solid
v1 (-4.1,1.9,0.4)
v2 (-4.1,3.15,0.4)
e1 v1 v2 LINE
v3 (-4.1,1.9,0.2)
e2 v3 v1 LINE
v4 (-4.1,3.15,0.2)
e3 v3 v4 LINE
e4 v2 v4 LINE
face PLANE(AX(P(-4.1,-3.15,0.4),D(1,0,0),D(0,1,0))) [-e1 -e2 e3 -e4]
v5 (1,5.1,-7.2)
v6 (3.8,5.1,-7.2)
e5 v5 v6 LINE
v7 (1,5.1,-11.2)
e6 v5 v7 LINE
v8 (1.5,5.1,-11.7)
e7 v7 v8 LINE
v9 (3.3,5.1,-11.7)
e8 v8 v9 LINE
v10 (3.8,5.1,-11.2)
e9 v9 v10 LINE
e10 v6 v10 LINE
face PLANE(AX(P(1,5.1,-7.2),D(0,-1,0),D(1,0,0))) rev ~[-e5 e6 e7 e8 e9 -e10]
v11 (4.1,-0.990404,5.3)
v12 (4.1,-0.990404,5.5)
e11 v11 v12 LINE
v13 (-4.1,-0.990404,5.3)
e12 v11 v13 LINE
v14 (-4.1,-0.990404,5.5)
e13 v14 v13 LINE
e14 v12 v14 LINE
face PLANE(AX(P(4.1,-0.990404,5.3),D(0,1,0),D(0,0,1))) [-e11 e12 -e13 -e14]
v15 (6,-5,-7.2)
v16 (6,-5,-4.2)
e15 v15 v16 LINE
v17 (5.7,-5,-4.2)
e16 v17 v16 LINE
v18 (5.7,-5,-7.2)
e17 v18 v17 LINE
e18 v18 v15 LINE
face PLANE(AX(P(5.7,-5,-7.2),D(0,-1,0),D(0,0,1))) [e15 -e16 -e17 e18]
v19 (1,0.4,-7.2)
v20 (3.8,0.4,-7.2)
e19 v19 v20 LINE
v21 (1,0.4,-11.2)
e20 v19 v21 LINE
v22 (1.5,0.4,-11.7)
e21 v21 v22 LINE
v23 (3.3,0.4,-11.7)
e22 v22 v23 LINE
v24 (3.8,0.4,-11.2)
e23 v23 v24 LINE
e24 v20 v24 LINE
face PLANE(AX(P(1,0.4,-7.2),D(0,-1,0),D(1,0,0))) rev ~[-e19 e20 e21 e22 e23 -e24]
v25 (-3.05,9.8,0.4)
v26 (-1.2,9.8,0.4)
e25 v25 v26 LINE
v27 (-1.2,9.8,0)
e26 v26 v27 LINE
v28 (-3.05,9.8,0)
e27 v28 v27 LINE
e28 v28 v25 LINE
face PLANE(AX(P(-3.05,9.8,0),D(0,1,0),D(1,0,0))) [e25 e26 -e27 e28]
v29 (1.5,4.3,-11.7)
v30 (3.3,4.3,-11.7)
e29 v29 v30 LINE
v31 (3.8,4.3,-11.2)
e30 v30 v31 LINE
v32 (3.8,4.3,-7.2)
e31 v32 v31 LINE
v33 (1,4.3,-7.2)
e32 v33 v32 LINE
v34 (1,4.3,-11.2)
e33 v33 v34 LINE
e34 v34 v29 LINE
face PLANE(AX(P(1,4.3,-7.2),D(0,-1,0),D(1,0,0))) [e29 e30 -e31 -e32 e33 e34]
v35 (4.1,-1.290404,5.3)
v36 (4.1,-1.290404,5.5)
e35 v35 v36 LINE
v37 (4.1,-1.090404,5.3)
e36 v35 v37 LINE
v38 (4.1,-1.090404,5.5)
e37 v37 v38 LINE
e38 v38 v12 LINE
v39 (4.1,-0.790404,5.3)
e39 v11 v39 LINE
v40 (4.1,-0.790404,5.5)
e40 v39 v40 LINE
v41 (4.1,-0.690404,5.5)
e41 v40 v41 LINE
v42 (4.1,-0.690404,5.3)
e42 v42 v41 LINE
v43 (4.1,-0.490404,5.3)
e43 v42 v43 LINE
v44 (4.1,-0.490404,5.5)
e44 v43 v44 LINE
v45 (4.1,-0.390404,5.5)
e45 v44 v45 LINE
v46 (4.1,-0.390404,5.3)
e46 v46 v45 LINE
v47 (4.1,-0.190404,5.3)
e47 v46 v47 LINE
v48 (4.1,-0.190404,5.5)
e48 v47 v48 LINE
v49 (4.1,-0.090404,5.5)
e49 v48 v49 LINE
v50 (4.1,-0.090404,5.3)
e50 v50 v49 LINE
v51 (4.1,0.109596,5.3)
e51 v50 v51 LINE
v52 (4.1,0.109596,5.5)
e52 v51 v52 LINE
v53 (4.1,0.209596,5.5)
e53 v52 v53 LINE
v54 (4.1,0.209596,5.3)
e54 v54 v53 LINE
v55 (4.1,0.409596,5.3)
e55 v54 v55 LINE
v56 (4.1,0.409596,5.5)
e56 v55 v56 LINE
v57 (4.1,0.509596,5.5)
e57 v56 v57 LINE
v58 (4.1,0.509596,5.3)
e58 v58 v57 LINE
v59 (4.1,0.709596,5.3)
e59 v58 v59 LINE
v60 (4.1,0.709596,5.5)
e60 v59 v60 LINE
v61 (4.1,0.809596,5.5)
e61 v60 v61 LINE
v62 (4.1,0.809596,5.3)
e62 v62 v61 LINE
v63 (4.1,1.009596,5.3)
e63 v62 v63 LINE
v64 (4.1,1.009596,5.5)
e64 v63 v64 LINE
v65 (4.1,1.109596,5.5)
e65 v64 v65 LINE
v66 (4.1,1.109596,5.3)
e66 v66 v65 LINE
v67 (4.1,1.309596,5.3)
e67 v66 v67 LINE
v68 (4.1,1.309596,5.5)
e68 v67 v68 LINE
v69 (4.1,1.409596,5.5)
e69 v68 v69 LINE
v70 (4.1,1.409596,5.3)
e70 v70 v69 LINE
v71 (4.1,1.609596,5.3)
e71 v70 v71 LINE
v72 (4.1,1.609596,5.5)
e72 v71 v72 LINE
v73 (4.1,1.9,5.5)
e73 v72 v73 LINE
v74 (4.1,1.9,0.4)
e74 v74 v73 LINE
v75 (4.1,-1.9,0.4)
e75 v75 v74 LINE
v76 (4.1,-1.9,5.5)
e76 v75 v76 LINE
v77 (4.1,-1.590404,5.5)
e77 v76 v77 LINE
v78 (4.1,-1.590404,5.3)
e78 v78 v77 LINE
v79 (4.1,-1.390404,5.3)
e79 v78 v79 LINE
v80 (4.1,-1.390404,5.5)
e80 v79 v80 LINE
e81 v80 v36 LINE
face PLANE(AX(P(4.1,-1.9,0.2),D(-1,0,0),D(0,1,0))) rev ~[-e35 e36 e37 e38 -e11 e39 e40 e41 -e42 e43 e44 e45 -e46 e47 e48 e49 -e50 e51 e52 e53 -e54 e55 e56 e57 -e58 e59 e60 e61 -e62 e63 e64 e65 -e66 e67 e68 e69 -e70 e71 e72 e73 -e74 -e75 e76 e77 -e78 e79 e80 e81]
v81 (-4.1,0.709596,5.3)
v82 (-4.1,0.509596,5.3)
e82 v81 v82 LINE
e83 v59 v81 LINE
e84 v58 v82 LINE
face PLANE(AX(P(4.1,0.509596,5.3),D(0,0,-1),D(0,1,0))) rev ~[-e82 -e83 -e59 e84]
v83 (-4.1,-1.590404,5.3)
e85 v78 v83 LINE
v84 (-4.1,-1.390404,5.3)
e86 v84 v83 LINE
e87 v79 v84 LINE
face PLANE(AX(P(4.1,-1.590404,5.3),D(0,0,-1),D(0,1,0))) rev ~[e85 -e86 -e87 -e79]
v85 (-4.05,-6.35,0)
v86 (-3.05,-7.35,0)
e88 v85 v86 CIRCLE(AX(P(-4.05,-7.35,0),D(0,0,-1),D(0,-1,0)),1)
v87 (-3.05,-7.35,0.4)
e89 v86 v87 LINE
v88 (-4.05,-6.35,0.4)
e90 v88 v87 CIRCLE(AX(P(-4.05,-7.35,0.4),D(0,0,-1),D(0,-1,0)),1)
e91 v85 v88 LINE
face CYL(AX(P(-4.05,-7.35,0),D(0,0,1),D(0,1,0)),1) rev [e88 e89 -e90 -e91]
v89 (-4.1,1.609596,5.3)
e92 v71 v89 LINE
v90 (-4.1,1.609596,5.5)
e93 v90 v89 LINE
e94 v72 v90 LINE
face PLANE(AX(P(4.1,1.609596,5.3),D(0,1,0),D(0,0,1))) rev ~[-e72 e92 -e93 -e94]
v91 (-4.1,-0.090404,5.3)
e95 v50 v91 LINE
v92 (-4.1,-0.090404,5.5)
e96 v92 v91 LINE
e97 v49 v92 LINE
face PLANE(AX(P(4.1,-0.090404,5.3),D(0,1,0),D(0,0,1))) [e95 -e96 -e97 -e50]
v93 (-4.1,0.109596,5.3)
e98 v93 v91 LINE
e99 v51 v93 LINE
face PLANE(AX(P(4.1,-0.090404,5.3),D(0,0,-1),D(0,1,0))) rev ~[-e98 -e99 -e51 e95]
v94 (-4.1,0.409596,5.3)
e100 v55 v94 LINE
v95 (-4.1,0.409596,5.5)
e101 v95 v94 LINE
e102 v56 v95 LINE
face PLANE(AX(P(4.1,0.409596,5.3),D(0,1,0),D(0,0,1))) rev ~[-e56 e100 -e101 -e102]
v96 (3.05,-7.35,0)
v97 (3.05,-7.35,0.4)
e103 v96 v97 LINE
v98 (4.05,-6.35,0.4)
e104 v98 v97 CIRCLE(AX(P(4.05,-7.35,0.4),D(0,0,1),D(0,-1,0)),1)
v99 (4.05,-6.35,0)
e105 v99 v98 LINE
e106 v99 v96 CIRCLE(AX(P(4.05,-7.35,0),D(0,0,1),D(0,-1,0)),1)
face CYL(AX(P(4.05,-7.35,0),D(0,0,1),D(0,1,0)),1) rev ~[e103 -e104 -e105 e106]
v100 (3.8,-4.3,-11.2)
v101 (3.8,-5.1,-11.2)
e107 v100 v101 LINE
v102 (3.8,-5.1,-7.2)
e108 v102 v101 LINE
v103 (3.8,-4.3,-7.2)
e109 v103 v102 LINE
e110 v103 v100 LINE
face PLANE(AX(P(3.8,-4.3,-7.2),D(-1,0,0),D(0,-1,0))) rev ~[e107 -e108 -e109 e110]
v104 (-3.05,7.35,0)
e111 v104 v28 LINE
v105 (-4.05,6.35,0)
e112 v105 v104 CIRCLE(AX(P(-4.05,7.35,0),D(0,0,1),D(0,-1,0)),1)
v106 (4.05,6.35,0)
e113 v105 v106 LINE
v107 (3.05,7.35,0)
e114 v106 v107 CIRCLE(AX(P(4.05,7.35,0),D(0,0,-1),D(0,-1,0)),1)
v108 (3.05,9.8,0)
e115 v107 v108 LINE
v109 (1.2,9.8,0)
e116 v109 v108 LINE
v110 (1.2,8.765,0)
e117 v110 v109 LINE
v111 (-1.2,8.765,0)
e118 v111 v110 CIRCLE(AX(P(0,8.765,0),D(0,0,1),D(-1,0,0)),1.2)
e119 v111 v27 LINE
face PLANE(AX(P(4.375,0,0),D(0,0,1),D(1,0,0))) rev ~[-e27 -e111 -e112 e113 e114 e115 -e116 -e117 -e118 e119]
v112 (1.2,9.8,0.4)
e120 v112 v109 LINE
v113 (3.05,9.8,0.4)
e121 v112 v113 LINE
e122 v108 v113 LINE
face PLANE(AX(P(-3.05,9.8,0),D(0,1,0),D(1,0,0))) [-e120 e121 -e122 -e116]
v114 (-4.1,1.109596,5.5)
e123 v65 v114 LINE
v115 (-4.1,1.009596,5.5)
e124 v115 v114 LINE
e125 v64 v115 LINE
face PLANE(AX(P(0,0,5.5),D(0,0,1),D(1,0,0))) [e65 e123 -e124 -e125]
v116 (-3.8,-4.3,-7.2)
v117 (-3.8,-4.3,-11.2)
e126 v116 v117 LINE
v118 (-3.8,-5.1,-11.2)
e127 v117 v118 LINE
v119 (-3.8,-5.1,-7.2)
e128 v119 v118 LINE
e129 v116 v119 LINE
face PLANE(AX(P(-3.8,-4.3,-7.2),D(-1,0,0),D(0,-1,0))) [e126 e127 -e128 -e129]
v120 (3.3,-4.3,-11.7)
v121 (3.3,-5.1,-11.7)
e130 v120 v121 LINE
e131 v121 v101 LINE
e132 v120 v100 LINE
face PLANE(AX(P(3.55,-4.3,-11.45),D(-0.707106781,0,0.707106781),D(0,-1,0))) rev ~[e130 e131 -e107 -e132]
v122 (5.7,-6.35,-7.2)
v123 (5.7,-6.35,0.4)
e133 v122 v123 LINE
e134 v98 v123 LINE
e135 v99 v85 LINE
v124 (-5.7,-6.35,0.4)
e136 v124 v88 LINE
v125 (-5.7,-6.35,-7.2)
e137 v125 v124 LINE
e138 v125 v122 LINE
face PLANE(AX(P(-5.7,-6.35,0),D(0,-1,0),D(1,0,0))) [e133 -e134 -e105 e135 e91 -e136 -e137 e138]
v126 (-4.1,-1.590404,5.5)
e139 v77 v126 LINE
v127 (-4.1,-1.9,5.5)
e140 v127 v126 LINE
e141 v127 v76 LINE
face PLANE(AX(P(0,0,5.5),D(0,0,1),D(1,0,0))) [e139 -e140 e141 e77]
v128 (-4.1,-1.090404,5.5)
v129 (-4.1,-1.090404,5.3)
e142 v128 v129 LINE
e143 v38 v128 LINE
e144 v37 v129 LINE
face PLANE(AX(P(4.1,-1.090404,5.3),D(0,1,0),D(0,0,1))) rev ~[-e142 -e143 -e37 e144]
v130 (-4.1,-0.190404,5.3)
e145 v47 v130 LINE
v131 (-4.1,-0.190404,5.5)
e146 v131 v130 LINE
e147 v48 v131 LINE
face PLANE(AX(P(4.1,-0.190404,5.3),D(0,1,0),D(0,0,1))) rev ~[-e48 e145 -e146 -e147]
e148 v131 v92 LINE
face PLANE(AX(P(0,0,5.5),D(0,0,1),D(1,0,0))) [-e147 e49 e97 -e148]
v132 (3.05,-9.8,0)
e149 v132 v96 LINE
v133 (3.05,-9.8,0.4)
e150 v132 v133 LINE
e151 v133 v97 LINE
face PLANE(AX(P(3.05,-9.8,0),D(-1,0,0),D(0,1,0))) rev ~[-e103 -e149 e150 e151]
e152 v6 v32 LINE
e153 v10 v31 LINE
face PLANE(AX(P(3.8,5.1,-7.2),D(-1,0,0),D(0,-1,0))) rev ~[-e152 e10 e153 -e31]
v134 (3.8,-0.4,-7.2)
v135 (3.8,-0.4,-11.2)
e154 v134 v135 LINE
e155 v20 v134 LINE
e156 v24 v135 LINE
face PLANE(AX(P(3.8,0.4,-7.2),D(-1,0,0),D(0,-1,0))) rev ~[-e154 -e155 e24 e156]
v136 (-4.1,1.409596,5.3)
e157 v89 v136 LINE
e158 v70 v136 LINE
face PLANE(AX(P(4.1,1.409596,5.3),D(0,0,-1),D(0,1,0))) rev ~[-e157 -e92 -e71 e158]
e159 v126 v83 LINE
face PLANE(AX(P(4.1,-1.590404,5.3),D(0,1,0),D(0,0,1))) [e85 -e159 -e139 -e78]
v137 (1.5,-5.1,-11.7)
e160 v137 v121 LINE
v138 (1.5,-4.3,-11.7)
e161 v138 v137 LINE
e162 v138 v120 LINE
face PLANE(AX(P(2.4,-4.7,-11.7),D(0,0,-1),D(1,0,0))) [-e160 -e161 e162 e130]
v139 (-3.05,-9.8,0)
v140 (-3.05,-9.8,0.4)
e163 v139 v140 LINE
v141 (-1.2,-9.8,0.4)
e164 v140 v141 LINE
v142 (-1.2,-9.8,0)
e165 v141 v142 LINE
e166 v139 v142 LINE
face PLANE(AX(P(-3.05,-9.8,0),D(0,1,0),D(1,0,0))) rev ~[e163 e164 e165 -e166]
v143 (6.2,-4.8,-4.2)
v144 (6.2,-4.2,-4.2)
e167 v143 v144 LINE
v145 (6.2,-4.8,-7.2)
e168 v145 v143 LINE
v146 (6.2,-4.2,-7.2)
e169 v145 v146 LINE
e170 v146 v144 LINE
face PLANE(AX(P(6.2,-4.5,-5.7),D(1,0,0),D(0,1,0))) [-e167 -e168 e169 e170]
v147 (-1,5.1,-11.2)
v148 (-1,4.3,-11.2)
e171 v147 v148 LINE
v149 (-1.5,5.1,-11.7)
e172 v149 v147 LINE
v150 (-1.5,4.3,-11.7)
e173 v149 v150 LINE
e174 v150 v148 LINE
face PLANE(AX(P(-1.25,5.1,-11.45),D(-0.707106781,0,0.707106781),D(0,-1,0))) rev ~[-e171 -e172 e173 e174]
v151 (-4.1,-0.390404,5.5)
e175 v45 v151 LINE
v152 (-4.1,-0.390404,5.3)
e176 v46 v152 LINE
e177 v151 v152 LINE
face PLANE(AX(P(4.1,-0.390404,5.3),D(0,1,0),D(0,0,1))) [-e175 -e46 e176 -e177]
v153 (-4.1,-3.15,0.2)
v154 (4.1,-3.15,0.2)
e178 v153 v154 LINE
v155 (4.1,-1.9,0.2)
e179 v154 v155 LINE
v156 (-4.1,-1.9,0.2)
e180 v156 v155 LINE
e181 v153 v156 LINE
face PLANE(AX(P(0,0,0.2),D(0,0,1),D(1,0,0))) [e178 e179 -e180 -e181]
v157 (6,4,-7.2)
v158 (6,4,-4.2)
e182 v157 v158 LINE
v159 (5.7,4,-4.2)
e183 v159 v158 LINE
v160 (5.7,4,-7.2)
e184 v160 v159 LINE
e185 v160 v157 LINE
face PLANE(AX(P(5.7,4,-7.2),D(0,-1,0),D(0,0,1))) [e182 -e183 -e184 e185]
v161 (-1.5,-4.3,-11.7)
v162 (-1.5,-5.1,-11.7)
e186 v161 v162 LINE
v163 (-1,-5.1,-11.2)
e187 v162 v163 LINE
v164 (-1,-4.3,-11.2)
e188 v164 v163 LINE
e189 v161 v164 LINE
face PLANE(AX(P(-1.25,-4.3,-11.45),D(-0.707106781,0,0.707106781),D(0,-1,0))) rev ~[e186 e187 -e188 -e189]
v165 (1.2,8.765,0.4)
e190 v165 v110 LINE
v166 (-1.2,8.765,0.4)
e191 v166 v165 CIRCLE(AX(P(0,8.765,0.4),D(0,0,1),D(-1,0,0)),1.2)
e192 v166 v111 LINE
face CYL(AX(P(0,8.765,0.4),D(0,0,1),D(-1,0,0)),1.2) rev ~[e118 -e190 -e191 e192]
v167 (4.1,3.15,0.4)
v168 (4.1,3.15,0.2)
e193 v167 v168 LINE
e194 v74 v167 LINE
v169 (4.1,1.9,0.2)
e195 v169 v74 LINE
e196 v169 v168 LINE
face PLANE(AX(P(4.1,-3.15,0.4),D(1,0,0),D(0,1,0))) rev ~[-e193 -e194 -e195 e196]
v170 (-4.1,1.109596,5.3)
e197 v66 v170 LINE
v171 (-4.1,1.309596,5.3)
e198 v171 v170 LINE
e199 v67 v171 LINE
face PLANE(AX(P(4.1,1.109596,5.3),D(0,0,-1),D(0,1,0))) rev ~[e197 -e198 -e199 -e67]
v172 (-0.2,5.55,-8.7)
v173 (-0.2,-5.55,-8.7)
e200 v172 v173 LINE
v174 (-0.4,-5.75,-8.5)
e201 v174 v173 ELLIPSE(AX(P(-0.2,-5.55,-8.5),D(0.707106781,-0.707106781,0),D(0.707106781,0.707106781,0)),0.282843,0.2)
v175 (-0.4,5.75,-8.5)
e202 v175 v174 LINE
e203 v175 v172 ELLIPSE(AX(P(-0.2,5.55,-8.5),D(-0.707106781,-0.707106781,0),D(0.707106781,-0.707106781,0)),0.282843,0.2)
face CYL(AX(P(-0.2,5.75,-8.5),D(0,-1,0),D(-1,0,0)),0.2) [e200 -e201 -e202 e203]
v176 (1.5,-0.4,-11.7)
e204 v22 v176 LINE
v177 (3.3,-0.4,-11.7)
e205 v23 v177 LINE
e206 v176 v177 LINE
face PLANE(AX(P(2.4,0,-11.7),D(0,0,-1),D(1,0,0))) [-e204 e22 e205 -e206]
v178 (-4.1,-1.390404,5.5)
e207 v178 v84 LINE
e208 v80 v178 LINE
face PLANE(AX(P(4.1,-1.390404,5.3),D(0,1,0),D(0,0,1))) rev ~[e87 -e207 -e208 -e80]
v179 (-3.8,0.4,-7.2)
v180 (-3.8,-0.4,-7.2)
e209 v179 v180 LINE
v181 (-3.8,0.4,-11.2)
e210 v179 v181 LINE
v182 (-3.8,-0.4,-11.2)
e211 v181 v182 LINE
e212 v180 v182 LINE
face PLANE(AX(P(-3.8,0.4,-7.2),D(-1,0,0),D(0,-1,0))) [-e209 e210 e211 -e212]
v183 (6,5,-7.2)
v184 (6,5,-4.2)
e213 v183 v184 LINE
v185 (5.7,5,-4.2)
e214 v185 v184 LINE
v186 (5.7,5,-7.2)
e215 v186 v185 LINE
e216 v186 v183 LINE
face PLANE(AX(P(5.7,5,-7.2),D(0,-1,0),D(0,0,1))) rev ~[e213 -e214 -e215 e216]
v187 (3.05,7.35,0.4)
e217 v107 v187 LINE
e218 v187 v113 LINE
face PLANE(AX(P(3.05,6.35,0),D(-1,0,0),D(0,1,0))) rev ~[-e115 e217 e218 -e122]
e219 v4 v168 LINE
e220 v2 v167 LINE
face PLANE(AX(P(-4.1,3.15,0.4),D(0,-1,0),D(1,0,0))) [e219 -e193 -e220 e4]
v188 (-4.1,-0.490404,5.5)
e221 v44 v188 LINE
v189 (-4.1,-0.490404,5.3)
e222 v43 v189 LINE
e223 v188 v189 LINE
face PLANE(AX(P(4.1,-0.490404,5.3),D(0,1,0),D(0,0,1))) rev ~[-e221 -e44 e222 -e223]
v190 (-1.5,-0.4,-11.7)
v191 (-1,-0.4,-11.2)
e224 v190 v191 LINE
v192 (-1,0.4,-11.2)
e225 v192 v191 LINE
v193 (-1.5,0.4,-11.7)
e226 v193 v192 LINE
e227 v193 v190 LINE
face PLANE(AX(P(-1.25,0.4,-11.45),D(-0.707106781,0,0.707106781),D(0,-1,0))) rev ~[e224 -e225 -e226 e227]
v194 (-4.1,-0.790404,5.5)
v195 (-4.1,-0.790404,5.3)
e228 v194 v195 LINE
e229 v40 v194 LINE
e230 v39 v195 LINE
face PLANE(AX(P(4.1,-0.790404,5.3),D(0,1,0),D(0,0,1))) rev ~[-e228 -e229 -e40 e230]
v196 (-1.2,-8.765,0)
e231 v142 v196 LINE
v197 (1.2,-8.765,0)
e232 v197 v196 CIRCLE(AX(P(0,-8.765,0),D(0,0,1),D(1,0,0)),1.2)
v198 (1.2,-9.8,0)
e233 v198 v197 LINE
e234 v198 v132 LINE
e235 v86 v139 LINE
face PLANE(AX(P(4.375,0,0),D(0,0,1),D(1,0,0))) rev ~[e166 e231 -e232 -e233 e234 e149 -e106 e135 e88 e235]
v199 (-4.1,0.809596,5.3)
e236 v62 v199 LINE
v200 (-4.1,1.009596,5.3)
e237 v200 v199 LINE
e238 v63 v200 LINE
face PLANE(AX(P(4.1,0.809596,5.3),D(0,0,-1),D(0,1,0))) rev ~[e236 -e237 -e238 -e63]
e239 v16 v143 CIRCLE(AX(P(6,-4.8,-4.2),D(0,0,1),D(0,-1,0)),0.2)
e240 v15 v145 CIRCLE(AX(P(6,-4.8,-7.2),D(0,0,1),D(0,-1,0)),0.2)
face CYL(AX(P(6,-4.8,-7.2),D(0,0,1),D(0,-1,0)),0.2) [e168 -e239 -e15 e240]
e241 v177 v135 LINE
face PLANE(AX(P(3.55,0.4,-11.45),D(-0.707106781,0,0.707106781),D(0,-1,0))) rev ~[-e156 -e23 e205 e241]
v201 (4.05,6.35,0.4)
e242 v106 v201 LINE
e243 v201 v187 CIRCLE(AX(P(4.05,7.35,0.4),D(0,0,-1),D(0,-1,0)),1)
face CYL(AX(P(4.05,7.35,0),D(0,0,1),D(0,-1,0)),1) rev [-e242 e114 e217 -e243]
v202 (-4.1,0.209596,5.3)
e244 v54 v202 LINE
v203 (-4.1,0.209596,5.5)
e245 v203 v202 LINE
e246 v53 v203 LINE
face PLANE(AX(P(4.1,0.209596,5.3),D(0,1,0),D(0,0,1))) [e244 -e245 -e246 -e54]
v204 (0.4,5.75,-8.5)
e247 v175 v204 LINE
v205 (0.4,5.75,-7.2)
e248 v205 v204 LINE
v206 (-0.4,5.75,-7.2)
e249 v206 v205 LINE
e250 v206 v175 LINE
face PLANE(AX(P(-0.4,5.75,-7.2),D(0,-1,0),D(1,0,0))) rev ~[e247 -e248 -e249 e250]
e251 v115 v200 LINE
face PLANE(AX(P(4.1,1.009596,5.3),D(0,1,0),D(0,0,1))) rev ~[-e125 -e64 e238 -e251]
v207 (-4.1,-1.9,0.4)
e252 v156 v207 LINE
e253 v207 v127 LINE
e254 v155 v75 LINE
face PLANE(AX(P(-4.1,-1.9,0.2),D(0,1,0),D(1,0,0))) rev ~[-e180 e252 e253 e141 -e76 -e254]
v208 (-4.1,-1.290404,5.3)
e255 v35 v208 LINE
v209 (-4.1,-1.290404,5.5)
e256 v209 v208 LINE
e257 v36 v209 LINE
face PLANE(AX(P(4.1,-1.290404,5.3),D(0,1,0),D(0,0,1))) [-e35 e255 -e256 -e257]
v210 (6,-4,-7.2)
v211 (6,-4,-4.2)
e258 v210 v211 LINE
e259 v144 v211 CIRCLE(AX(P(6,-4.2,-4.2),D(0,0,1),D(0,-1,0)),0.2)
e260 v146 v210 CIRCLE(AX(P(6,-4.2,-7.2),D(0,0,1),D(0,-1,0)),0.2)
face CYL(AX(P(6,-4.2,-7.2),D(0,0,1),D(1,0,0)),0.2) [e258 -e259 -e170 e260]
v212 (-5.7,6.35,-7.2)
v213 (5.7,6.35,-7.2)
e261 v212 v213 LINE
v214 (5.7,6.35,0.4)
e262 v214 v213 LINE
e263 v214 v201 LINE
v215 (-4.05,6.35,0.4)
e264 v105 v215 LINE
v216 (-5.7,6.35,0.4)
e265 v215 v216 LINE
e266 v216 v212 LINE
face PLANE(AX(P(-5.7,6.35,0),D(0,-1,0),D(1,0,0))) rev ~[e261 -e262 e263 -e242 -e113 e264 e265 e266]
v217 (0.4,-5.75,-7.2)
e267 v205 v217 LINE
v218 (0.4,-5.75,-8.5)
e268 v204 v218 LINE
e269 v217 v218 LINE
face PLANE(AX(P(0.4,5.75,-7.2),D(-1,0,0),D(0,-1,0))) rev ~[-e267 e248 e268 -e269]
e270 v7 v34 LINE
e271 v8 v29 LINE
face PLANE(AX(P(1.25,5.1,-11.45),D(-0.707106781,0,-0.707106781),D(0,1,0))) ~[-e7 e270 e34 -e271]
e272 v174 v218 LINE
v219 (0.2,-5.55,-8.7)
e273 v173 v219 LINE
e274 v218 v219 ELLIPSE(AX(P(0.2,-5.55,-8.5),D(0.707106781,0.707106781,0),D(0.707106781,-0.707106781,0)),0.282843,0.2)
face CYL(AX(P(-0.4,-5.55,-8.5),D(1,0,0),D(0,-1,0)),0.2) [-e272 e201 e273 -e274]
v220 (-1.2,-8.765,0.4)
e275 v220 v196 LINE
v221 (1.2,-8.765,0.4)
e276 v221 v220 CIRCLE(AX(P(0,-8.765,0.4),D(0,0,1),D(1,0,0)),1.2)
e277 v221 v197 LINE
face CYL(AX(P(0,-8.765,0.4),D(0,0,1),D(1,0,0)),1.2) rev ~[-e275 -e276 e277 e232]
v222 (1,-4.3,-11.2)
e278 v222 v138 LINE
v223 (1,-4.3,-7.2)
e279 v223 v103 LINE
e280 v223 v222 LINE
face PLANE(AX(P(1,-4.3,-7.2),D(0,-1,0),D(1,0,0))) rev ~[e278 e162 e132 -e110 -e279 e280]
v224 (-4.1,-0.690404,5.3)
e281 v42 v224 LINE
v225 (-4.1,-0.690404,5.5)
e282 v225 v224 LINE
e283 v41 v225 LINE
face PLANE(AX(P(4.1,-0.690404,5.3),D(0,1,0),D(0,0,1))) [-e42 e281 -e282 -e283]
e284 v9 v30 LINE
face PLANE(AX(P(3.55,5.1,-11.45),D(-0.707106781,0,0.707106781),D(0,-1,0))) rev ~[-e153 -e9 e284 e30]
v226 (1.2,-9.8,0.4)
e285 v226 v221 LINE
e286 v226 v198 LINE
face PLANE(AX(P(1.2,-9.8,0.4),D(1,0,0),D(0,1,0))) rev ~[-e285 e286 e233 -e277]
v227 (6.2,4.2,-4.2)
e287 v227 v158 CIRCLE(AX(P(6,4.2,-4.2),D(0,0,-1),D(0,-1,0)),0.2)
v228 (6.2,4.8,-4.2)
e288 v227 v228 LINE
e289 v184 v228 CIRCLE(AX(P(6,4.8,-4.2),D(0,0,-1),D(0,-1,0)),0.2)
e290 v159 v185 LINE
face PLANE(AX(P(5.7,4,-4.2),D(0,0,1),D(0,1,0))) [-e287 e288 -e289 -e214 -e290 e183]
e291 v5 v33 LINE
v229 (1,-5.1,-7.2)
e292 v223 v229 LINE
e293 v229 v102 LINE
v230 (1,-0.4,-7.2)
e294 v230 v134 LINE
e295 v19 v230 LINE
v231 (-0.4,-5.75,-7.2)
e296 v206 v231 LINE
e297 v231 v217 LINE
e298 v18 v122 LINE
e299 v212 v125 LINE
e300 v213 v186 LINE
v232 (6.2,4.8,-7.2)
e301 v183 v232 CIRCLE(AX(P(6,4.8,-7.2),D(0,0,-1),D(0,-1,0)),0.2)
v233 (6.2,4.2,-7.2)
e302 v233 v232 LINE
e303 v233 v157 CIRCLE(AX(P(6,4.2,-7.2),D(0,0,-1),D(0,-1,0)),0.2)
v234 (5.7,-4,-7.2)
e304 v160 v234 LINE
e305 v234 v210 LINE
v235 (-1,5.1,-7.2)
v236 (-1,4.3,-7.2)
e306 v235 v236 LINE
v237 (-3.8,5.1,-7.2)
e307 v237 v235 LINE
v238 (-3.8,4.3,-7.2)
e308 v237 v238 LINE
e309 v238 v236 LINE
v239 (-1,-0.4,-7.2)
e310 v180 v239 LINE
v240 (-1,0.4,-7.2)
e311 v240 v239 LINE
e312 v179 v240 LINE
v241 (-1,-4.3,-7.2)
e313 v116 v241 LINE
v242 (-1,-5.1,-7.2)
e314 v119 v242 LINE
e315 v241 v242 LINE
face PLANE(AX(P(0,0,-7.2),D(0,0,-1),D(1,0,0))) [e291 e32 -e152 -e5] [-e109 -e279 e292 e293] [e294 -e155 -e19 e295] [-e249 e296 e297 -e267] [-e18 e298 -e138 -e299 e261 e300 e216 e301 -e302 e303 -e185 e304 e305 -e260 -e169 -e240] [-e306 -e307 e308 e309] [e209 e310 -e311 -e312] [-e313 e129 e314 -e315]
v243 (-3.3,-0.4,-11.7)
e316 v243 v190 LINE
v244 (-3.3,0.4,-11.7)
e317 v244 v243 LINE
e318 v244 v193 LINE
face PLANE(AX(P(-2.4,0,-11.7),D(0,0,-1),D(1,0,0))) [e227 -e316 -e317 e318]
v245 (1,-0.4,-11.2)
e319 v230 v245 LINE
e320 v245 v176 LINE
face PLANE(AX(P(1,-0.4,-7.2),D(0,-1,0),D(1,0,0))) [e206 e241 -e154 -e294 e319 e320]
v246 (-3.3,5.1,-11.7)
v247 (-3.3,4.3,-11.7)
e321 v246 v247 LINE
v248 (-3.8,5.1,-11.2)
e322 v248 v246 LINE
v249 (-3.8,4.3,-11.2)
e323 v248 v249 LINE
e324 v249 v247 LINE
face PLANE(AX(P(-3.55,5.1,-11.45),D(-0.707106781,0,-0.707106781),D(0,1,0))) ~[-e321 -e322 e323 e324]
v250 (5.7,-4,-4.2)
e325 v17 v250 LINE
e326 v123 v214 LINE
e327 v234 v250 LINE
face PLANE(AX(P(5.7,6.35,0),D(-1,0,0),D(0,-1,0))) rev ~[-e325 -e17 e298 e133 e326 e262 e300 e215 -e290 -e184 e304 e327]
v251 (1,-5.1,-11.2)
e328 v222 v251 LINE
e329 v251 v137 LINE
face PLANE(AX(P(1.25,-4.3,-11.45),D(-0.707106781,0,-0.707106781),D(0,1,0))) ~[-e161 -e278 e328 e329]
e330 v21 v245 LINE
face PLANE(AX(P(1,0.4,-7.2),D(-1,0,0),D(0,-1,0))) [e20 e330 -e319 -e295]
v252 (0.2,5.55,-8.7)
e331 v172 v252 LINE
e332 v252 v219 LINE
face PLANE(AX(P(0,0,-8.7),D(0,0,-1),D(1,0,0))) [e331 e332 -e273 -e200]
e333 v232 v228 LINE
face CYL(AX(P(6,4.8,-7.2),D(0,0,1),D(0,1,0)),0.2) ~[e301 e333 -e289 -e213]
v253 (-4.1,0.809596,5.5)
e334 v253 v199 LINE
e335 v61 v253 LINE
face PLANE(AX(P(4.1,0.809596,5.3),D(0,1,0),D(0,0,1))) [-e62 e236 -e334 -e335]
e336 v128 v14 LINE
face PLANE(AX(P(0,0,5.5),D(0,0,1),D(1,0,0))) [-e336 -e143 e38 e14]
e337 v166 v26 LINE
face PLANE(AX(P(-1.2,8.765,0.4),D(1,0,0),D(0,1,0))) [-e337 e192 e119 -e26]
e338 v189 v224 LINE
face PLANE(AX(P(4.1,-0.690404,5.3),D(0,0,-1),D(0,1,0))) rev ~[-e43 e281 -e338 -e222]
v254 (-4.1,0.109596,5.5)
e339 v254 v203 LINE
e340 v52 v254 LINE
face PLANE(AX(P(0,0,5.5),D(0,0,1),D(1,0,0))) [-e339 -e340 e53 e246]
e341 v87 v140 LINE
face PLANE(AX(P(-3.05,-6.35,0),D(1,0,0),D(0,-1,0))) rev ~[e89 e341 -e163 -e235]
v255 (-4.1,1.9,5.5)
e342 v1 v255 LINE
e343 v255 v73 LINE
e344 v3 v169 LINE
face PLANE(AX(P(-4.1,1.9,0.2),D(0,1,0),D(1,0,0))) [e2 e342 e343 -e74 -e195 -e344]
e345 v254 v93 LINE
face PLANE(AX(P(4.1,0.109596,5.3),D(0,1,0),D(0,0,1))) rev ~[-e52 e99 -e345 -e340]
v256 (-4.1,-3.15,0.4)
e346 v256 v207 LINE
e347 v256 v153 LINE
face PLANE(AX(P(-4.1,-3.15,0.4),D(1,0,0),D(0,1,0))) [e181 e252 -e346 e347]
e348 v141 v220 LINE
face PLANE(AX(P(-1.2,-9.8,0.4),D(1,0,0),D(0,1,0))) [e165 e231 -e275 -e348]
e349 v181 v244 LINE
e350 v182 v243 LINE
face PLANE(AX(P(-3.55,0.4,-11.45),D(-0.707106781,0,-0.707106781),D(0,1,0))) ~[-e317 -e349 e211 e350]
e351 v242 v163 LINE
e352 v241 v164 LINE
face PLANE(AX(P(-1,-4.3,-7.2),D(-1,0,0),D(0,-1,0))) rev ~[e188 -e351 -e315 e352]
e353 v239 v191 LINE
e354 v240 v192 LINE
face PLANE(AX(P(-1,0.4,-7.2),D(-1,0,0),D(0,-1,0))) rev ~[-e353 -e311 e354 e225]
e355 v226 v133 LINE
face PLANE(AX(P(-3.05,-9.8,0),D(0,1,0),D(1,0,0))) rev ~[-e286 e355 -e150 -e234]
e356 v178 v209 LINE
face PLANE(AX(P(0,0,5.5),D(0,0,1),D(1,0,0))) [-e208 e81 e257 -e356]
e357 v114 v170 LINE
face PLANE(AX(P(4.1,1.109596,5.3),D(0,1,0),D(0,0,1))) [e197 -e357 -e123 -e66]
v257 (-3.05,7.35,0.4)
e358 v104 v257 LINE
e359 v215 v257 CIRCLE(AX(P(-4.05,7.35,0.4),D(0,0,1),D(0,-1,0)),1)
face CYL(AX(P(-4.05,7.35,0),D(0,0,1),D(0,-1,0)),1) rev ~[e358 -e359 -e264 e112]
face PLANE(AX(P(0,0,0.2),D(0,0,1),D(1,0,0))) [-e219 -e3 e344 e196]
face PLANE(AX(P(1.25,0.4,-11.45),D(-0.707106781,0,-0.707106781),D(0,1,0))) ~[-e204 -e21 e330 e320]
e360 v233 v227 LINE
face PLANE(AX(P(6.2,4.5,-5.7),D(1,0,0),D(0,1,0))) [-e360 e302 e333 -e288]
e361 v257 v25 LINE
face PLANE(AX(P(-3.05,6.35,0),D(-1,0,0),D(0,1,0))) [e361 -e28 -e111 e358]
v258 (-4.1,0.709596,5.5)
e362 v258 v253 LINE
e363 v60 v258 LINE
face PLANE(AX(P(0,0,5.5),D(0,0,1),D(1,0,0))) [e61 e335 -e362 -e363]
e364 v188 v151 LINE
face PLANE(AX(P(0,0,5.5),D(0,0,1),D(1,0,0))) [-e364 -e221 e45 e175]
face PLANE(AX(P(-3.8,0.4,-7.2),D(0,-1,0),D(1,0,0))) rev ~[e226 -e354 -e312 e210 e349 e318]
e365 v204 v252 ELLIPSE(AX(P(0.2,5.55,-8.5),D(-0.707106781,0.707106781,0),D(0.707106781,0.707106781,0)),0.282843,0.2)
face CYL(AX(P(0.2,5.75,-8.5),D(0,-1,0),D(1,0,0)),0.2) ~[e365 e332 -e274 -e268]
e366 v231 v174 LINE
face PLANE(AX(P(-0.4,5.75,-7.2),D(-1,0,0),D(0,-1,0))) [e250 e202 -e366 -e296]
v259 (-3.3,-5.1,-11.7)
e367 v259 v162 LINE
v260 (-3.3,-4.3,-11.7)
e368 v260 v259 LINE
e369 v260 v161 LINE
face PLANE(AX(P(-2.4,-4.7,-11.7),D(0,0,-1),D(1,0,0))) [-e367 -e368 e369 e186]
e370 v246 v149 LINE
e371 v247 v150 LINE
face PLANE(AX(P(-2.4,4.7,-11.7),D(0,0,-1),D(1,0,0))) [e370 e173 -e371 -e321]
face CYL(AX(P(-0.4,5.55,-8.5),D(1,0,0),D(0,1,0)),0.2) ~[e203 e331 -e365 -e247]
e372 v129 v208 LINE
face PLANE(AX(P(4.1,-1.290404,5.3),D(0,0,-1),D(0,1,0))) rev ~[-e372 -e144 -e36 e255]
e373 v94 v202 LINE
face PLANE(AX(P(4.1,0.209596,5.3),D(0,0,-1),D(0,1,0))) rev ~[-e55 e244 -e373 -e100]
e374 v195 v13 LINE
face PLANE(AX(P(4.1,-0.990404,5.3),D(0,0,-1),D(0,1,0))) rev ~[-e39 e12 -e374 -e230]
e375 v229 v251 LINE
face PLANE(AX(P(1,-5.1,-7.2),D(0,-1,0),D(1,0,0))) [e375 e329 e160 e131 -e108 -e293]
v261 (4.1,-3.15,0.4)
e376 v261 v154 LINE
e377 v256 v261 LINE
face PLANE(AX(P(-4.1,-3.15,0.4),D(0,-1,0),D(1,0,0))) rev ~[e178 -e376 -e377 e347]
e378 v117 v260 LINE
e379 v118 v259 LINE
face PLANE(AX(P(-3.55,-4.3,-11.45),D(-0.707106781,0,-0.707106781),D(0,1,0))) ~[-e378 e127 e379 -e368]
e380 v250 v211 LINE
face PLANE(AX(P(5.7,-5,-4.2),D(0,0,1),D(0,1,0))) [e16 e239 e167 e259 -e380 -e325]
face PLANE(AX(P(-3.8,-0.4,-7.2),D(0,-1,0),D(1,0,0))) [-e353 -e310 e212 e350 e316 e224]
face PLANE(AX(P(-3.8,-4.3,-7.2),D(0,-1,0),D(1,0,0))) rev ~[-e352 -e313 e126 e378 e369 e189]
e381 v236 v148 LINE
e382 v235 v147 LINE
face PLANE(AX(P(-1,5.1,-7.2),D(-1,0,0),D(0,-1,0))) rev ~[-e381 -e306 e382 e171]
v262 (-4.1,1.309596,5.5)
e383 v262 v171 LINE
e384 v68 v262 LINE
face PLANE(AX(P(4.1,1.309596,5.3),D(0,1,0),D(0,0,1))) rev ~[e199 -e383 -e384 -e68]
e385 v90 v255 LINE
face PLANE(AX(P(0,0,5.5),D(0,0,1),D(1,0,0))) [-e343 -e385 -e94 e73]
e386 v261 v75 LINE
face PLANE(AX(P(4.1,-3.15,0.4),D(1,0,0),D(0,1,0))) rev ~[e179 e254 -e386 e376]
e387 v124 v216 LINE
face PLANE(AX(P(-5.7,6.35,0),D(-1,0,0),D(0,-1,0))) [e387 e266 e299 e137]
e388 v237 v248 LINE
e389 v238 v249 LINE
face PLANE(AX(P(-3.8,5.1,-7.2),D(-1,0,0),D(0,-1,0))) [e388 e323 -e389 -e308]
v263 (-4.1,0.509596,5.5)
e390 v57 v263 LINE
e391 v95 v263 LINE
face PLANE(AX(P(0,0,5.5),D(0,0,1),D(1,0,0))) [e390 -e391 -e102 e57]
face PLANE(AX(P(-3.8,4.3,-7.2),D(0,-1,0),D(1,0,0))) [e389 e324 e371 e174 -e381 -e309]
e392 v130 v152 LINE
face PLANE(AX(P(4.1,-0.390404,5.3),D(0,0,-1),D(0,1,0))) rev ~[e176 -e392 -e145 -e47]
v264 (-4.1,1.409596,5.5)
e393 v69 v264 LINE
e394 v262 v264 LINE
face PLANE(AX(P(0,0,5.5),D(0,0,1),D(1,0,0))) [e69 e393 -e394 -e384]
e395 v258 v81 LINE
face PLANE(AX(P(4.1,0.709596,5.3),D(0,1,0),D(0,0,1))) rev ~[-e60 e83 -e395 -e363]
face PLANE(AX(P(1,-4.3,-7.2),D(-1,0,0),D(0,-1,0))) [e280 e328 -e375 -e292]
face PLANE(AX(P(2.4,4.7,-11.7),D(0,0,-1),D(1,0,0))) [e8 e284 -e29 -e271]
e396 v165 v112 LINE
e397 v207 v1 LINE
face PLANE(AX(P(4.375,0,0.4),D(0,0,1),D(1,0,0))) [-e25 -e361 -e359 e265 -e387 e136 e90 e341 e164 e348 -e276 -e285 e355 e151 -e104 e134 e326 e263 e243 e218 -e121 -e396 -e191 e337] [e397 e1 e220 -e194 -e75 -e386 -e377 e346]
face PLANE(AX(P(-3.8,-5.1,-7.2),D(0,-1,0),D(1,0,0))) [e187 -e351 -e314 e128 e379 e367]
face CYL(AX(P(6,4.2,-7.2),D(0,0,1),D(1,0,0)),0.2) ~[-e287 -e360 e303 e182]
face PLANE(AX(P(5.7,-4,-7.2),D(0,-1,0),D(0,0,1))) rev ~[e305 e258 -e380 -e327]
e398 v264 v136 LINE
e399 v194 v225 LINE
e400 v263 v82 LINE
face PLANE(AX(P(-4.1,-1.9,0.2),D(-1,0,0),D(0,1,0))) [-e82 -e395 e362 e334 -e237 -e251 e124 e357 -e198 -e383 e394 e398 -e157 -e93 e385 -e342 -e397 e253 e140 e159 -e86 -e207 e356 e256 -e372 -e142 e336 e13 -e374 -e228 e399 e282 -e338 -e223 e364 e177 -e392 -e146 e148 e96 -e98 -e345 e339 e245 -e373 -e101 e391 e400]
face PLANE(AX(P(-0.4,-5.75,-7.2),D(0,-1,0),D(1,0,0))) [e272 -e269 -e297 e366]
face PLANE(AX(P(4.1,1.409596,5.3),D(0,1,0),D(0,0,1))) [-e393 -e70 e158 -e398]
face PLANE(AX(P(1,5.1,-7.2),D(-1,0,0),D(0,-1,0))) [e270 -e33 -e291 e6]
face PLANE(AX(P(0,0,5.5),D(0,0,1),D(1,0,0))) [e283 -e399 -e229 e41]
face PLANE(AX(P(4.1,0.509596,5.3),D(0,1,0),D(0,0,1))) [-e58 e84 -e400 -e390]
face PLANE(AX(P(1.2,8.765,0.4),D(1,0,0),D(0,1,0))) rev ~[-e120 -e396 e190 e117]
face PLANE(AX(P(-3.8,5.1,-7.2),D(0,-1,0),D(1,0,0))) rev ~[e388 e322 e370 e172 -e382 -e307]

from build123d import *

# Parameters (mm, degrees)
F0_W      = 2.65
F0_H      = 12.7
F0_W_2    = 6.1
F0_H_2    = 3.45
F1_DEPTH  = 0.4
F2_W      = 2.4
F2_H      = 1.035
F3_DEPTH  = 1
F4_W      = 8.2
F4_H      = 6.3
F5_DEPTH  = 0.2
F6_W      = 8.2
F6_H      = 3.8
F7_DEPTH  = 5.3
F8_W      = 11.4
F8_H      = 12.7
F9_DEPTH  = 7.2
F10_W     = 1
F10_H     = 3
F11_DEPTH = 0.5
F12_W     = 2.8
F12_H     = 0.8
F13_DEPTH = 4.5
F14_R     = 1
F15_SIZE  = 0.5
F16_W     = 0.8
F16_H     = 11.5
F17_DEPTH = 1.5
F18_R     = 0.2
F19_W     = 0.2
F19_H     = 0.2
F20_DEPTH = 25


with BuildPart() as f1:
    # F0 (on Top) → F1 (new body)
    with BuildSketch(Plane.XY):
        with Locations((4.375, 0)):
            Rectangle(F0_W, F0_H)
        with Locations((0, -8.075)):
            Rectangle(F0_W_2, F0_H_2)
        Rectangle(F0_W_2, F0_H)
        with Locations((-4.375, 0)):
            Rectangle(F0_W, F0_H)
        with Locations((0, 8.075)):
            Rectangle(F0_W_2, F0_H_2)
    extrude(amount=F1_DEPTH)

    # F2 (on face) → F3 (cut)
    with BuildSketch(Plane.XY.offset(0.4)):
        with BuildLine():
            ThreePointArc((-1.2, 8.765), (0, 7.565), (1.2, 8.765))
            Line((1.2, 8.765), (-1.2, 8.765))
        make_face()
        with Locations((0, 9.2825)):
            Rectangle(F2_W, F2_H)
        with BuildLine():
            Line((-1.2, -8.765), (1.2, -8.765))
            ThreePointArc((1.2, -8.765), (0, -7.565), (-1.2, -8.765))
        make_face()
        with Locations((0, -9.2825)):
            Rectangle(F2_W, F2_H)
    extrude(amount=-F3_DEPTH, mode=Mode.SUBTRACT)

    # F4 (on face) → F5 (cut)
    with BuildSketch(Plane.XY.offset(0.4)):
        Rectangle(F4_W, F4_H)
    extrude(amount=-F5_DEPTH, mode=Mode.SUBTRACT)

    # F6 (on face) → F7 (join)
    with BuildSketch(Plane.XY.offset(0.2)):
        Rectangle(F6_W, F6_H)
    extrude(amount=F7_DEPTH)

    # F8 (on face) → F9 (join)
    with BuildSketch(Plane(origin=(0, 0, 0), x_dir=(1, 0, 0), z_dir=(0, 0, -1))):
        Rectangle(F8_W, F8_H)
    extrude(amount=F9_DEPTH)

    # F10 (on face) → F11 (join)
    with BuildSketch(Plane.YZ.offset(5.7)):
        with Locations((4.5, -5.7)):
            Rectangle(F10_W, F10_H)
        with Locations((-4.5, -5.7)):
            Rectangle(F10_W, F10_H)
    extrude(amount=F11_DEPTH)

    # F12 (on face) → F13 (join)
    with BuildSketch(Plane(origin=(0, 0, -7.2), x_dir=(1, 0, 0), z_dir=(0, 0, -1))):
        with Locations((2.4, -4.7)):
            Rectangle(F12_W, F12_H)
        with Locations((2.4, 0)):
            Rectangle(F12_W, F12_H)
        with Locations((2.4, 4.7)):
            Rectangle(F12_W, F12_H)
        with Locations((-2.4, -4.7)):
            Rectangle(F12_W, F12_H)
        with Locations((-2.4, 0)):
            Rectangle(F12_W, F12_H)
        with Locations((-2.4, 4.7)):
            Rectangle(F12_W, F12_H)
    extrude(amount=F13_DEPTH)

    # F14
    f14_edges = [f1.edges().sort_by_distance(p)[0] for p in [
        (3.05, 6.35, 0.2),
        (-3.05, 6.35, 0.2),
        (3.05, -6.35, 0.2),
        (-3.05, -6.35, 0.2),
    ]]
    fillet(f14_edges, radius=F14_R)

    # F15
    f15_edges = [f1.edges().sort_by_distance(p)[0] for p in [
        (1, 4.7, -11.7),
        (3.8, 4.7, -11.7),
        (-1, 4.7, -11.7),
        (-3.8, 4.7, -11.7),
        (1, 0, -11.7),
        (3.8, 0, -11.7),
        (-1, 0, -11.7),
        (-3.8, 0, -11.7),
        (-3.8, -4.7, -11.7),
        (-1, -4.7, -11.7),
        (1, -4.7, -11.7),
        (3.8, -4.7, -11.7),
    ]]
    chamfer(f15_edges, length=F15_SIZE)

    # F16 (on face) → F17 (join)
    with BuildSketch(Plane(origin=(0, 0, -7.2), x_dir=(1, 0, 0), z_dir=(0, 0, -1))):
        Rectangle(F16_W, F16_H)
    extrude(amount=F17_DEPTH)

    # F18
    f18_edges = [f1.edges().sort_by_distance(p)[0] for p in [
        (0, -5.75, -8.7),
        (0, 5.75, -8.7),
        (0.4, 0, -8.7),
        (-0.4, 0, -8.7),
        (6.2, -5, -5.7),
        (6.2, -4, -5.7),
        (6.2, 5, -5.7),
        (6.2, 4, -5.7),
    ]]
    fillet(f18_edges, radius=F18_R)

    # F19 (on face) → F20 (cut)
    with BuildSketch(Plane.YZ.offset(4.1)):
        with Locations((-1.4904041938, 5.4)):
            Rectangle(F19_W, F19_H)
        with Locations((-1.1904041938, 5.4)):
            Rectangle(F19_W, F19_H)
        with Locations((-0.8904041938, 5.4)):
            Rectangle(F19_W, F19_H)
        with Locations((-0.5904041938, 5.4)):
            Rectangle(F19_W, F19_H)
        with Locations((-0.2904041938, 5.4)):
            Rectangle(F19_W, F19_H)
        with Locations((0.0095958062, 5.4)):
            Rectangle(F19_W, F19_H)
        with Locations((0.3095958062, 5.4)):
            Rectangle(F19_W, F19_H)
        with Locations((0.6095958062, 5.4)):
            Rectangle(F19_W, F19_H)
        with Locations((0.9095958062, 5.4)):
            Rectangle(F19_W, F19_H)
        with Locations((1.2095958062, 5.4)):
            Rectangle(F19_W, F19_H)
        with Locations((1.5095958062, 5.4)):
            Rectangle(F19_W, F19_H)
    extrude(amount=-F20_DEPTH, mode=Mode.SUBTRACT)


solid = f1.part
